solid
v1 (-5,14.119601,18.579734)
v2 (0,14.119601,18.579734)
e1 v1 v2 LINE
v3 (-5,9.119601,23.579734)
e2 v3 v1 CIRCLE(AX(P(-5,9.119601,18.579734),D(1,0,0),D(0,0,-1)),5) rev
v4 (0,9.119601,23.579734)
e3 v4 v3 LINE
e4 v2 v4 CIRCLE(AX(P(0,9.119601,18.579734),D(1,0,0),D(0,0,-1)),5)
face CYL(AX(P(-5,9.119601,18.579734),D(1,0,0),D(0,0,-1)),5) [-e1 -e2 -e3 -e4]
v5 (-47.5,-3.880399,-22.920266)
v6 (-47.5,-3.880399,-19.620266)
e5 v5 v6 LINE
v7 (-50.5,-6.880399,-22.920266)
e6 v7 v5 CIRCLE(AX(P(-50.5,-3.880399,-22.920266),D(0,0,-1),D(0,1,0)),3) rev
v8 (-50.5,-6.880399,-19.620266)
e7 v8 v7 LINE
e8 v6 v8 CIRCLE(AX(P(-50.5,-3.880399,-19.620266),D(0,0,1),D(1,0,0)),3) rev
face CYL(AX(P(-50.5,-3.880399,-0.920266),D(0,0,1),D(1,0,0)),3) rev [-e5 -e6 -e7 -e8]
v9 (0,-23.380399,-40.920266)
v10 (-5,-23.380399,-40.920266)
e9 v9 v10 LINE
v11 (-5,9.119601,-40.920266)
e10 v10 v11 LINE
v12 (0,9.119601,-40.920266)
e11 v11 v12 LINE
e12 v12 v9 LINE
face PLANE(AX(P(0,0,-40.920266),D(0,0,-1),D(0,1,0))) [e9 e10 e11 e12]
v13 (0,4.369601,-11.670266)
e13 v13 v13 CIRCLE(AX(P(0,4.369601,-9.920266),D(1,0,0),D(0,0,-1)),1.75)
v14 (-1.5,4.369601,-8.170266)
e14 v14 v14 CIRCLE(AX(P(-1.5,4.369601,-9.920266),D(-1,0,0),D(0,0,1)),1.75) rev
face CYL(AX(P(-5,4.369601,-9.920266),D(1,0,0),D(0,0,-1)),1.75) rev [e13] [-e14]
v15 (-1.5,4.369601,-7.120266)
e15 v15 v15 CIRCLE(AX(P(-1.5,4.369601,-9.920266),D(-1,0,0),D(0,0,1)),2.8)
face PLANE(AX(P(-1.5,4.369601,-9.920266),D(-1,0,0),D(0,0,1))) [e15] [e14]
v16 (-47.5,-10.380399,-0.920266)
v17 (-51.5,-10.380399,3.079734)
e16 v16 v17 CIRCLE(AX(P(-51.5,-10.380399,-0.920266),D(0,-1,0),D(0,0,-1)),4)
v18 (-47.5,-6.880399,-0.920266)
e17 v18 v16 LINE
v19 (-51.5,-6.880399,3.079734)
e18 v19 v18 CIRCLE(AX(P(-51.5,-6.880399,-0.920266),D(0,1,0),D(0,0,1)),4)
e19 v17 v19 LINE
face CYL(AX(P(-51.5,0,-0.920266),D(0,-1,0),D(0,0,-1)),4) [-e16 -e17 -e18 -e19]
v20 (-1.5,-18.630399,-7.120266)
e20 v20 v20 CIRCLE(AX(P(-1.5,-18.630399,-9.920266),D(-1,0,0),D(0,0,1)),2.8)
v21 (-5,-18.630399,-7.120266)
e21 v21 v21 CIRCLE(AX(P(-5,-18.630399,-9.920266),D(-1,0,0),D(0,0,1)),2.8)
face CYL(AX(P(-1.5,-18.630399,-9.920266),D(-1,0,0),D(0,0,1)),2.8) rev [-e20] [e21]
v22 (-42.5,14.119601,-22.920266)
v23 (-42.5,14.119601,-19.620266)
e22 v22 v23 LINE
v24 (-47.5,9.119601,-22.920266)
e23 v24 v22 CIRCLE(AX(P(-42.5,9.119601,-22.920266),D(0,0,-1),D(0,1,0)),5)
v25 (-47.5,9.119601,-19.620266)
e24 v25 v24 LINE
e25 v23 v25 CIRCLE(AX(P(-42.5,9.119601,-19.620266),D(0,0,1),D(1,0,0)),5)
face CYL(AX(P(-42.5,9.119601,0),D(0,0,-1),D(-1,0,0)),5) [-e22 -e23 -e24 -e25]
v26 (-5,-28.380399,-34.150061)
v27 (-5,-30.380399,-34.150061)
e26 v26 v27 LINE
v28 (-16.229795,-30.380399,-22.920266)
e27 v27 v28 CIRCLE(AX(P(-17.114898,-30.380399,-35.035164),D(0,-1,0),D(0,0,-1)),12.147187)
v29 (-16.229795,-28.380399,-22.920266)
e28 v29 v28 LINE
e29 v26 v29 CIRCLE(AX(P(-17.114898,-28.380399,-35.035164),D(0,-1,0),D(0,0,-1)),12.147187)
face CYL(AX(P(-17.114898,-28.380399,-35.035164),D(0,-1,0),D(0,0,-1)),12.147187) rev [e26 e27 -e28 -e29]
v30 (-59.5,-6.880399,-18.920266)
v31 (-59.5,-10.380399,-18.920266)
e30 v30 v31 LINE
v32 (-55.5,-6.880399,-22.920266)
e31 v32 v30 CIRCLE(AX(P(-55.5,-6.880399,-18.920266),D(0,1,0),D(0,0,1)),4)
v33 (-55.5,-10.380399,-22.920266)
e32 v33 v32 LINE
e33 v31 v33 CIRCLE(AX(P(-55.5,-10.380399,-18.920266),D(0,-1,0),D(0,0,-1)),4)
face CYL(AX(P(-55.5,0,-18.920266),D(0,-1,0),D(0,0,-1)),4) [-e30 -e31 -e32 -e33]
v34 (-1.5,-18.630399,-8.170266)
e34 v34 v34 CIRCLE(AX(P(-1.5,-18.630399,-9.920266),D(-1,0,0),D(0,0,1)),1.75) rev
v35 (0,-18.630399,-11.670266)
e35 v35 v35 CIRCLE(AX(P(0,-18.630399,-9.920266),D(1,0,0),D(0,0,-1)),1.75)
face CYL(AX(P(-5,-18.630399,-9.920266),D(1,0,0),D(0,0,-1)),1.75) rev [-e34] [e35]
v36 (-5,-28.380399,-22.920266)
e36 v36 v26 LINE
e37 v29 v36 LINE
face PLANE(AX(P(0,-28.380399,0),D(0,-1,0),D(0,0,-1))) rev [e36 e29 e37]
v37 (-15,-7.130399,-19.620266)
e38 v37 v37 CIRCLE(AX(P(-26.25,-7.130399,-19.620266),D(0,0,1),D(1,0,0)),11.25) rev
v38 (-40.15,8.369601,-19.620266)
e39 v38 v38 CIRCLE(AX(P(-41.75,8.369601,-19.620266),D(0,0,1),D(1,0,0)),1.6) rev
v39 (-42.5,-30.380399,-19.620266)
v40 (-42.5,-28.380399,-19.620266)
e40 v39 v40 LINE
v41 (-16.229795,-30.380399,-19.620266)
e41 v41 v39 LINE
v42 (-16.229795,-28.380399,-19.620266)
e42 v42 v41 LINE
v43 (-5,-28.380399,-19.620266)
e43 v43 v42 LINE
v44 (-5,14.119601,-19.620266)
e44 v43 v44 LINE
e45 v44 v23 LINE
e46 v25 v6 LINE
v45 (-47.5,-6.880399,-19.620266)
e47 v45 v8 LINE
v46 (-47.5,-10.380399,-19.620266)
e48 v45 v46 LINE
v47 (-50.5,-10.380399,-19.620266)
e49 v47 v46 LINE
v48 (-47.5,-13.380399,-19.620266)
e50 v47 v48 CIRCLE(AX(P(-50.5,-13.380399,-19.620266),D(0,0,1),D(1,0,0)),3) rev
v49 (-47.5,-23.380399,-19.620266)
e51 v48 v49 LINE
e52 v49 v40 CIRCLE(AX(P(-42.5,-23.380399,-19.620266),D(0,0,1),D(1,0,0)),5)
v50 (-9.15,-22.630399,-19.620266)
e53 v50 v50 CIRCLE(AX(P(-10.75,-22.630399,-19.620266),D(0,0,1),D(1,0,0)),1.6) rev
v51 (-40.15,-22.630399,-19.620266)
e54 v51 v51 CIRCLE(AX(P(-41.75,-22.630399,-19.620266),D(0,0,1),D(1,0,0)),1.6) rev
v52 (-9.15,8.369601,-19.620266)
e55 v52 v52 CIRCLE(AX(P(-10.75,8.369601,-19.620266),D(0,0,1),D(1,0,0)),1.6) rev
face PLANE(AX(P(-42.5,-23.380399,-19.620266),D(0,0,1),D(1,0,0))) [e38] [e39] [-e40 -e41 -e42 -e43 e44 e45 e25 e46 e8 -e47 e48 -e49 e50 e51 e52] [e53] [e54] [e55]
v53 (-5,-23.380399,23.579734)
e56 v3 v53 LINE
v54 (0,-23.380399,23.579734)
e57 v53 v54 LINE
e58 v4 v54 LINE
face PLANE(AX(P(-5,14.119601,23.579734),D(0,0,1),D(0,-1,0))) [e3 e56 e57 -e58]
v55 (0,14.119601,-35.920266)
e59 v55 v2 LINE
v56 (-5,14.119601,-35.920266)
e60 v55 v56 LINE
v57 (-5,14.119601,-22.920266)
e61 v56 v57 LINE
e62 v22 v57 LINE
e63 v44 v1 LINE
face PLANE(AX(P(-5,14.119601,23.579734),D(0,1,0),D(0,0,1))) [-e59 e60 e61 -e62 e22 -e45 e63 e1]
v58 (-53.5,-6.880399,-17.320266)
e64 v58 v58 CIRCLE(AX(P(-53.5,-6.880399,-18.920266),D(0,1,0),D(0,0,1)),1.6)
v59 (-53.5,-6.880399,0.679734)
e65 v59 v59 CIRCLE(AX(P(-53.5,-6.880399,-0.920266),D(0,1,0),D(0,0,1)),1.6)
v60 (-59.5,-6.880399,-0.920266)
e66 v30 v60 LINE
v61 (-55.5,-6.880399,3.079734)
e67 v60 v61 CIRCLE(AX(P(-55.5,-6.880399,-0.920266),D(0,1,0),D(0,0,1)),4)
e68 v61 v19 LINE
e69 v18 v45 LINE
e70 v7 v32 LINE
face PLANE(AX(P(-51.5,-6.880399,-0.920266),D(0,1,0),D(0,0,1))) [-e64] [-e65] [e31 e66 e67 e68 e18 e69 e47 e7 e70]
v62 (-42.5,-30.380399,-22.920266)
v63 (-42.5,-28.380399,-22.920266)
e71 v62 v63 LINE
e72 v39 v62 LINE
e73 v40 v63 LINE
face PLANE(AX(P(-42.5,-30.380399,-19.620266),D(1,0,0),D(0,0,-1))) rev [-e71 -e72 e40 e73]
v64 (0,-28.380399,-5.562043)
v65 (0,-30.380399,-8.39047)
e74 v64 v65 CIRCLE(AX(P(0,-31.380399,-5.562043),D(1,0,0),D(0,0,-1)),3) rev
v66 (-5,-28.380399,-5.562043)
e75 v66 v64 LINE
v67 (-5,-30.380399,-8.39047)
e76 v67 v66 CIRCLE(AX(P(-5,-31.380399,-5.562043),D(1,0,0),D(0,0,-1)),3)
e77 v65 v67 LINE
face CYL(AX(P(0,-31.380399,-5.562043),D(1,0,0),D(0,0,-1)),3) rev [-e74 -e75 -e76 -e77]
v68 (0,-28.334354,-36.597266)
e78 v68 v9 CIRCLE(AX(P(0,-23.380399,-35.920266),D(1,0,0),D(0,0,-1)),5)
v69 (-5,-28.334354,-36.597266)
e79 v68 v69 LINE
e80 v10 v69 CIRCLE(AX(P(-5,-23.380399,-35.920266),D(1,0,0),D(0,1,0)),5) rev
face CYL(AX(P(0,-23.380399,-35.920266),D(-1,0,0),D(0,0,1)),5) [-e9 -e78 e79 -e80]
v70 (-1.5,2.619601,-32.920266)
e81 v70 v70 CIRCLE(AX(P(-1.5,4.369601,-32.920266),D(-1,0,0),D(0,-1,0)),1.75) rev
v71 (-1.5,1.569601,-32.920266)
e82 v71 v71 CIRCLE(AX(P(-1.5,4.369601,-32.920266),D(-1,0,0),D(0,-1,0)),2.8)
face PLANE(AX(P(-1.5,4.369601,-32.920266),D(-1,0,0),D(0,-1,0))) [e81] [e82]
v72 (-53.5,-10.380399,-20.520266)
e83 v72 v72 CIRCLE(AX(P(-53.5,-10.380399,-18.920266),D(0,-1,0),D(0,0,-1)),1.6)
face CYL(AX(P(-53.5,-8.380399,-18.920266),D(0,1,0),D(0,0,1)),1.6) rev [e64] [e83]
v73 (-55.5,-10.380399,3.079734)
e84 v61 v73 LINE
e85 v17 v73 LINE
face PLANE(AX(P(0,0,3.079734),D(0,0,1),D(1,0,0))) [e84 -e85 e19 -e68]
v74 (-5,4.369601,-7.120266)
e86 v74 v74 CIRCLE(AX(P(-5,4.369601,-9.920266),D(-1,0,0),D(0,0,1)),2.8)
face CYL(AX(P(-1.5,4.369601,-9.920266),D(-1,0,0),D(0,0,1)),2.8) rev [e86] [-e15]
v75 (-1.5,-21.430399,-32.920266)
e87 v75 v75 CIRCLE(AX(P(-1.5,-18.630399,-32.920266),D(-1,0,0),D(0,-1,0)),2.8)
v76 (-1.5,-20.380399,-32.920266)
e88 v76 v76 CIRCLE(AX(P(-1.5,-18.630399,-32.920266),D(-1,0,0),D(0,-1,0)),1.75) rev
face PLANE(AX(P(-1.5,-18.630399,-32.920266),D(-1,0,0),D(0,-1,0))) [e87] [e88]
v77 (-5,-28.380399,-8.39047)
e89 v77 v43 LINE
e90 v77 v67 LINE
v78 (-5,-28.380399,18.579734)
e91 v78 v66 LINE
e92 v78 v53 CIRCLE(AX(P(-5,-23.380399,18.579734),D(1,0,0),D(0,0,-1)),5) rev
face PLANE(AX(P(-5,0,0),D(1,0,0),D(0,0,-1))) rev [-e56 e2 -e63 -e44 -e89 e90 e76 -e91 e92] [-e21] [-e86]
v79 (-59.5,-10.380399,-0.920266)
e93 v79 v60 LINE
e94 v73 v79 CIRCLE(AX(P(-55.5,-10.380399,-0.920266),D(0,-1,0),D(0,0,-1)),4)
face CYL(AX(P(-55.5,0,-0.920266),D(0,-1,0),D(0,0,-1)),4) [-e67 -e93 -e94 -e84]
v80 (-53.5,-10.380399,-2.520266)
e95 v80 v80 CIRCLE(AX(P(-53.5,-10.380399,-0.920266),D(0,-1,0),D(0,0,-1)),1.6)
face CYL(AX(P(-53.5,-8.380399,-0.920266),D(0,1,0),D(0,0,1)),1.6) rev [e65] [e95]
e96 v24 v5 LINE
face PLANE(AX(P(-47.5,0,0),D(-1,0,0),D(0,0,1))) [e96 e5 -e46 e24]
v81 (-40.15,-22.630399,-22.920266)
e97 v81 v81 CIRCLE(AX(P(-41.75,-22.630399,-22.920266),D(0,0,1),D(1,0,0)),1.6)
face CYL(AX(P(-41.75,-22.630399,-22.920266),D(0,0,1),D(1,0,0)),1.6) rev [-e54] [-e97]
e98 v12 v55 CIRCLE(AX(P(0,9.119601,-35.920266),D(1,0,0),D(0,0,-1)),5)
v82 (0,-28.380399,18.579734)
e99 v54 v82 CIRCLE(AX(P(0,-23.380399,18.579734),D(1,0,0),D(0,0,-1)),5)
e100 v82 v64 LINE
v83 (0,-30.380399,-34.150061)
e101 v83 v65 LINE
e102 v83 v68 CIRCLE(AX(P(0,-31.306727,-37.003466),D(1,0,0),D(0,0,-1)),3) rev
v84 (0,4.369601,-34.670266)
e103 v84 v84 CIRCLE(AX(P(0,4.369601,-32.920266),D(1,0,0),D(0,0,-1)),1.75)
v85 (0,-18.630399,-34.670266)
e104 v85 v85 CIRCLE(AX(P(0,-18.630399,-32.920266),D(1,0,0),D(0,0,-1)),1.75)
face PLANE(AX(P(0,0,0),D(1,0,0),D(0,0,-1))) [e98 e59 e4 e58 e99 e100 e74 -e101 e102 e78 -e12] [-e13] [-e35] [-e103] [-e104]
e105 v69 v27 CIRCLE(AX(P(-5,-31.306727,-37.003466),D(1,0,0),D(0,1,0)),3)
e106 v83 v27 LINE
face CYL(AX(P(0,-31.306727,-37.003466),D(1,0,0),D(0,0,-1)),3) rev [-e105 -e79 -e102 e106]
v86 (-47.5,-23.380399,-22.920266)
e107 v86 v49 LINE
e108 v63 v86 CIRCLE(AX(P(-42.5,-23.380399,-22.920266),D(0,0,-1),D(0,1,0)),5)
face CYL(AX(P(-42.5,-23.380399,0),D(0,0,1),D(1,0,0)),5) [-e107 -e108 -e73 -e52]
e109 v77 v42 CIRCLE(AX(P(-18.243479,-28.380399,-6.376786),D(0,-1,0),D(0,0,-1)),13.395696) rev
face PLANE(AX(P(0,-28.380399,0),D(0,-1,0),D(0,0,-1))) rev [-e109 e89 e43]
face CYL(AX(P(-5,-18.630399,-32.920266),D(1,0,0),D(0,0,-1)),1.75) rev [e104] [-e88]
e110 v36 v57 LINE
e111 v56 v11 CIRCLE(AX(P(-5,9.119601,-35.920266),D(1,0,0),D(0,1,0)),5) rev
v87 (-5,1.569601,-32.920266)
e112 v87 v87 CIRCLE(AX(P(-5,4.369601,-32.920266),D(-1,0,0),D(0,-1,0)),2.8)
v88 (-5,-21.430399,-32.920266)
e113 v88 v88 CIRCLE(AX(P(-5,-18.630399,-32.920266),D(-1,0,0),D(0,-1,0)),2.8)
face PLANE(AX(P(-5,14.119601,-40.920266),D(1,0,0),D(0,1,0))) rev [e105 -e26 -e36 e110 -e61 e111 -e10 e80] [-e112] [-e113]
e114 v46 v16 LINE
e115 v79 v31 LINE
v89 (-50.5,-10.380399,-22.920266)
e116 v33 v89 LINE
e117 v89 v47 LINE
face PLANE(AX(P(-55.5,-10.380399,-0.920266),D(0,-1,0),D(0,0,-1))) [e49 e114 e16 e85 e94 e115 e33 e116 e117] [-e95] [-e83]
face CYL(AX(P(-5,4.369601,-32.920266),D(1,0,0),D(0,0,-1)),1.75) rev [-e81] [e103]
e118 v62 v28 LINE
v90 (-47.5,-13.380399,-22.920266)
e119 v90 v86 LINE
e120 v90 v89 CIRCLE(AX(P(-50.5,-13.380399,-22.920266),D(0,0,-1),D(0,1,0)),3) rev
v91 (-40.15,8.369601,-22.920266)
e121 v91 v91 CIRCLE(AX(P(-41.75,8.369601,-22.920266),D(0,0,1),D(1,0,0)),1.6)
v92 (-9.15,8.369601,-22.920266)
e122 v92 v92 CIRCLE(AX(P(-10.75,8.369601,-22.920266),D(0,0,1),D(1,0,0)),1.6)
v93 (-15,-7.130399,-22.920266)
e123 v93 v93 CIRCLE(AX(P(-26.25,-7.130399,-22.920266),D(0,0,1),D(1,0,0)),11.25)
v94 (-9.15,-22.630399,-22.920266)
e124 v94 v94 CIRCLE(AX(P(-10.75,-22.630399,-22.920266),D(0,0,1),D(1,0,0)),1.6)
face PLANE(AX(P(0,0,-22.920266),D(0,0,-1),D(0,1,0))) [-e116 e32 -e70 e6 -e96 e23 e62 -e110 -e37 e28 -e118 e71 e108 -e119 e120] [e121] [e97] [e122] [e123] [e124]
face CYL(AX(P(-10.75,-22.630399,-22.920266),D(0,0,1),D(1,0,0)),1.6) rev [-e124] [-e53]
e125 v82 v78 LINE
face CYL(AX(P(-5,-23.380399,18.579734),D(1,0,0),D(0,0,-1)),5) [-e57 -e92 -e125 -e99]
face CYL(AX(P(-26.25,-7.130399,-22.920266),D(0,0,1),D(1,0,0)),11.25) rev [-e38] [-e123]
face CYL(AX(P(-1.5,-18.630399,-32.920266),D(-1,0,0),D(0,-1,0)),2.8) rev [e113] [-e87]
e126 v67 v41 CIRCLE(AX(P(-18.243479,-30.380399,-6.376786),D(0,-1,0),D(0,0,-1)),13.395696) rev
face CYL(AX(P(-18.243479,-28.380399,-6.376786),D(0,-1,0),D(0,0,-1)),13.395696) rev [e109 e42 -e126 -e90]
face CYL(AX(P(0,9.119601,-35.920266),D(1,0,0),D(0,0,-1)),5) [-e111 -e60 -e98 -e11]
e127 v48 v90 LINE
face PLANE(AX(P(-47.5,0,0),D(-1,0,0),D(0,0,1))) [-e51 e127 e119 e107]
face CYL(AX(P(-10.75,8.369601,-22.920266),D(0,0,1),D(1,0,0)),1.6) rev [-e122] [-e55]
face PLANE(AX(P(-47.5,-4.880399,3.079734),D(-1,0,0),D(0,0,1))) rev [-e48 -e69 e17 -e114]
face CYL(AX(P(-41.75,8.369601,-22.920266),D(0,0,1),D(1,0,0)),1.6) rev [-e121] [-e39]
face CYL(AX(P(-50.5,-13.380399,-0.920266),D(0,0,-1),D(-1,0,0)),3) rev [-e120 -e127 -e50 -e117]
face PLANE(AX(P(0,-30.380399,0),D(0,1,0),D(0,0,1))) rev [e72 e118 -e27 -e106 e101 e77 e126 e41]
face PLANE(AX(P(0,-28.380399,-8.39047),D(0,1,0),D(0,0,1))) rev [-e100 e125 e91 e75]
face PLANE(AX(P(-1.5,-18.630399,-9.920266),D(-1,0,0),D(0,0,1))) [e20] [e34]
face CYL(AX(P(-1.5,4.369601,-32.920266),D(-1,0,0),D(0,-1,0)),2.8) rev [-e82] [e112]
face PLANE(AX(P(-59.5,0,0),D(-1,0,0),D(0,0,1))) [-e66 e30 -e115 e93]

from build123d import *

# Parameters (mm, degrees)
CROQUIS1_W               = 42.5
CROQUIS1_H               = 42.5
SALIENTE_EXTRUIR1_DEPTH  = 5
CROQUIS6_W               = 5
CROQUIS6_H               = 42.5
SALIENTE_EXTRUIR2_DEPTH  = 4
CROQUIS7_W               = 4
CROQUIS7_H               = 42.5
SALIENTE_EXTRUIR3_DEPTH  = 42.5
CROQUIS8_R               = 11.25
CROQUIS8_R_2             = 1.6
CORTAR_EXTRUIR2_DEPTH    = 4
CROQUIS10_W              = 4
CROQUIS10_H              = 3.5
SALIENTE_EXTRUIR4_DEPTH  = 12
CROQUIS11_W              = 12
CROQUIS11_H              = 3.5
SALIENTE_EXTRUIR5_DEPTH  = 22
CROQUIS12_R              = 1.6
CORTAR_EXTRUIR4_DEPTH    = 3.5
REDONDEO1_R              = 5
REDONDEO2_R              = 5
REDONDEO3_R              = 4
CORTAR_EXTRUIR5_DEPTH    = 0.7
CROQUIS14_W              = 5
CROQUIS14_H              = 42.5
SALIENTE_EXTRUIR6_DEPTH  = 18
CROQUIS15_R              = 1.75
CORTAR_EXTRUIR6_DEPTH    = 5
CROQUIS16_R              = 2.8
CORTAR_EXTRUIR7_DEPTH    = 3.5
CROQUIS17_R              = 2.8
CORTAR_EXTRUIR8_DEPTH    = 3.5
REDONDEO5_R              = 5
CROQUIS18_R              = 1.6
SALIENTE_EXTRUIR8_DEPTH  = 2
CROQUIS19_R              = 1.6
CORTAR_EXTRUIR9_DEPTH    = 2
REDONDEO7_R              = 3
REDONDEO8_R              = 3
SALIENTE_EXTRUIR9_DEPTH  = 2
SALIENTE_EXTRUIR10_DEPTH = 2
CROQUIS22_W              = 26.97020456
CROQUIS22_H              = 2
CORTAR_EXTRUIR10_DEPTH   = 5
CROQUIS23_W              = 1.770204561
CROQUIS23_H              = 2
CORTAR_EXTRUIR11_DEPTH   = 5
REDONDEO9_R              = 3


with BuildPart() as part:
    # Croquis1 → Saliente-Extruir1 (new body)
    with BuildSketch(Plane(origin=(0, 0, 0), x_dir=(0, 0, -1), z_dir=(1, 0, 0))):
        with Locations((-2.329734219, -7.130398671)):
            Rectangle(CROQUIS1_W, CROQUIS1_H)
    extrude(amount=-SALIENTE_EXTRUIR1_DEPTH)

    # Croquis6 → Saliente-Extruir2 (add)
    with BuildSketch(Plane(origin=(0, 0, -18.920265781), x_dir=(-1, 0, 0), z_dir=(0, 0, -1))):
        with Locations((2.5, -7.130398671)):
            Rectangle(CROQUIS6_W, CROQUIS6_H)
    extrude(amount=SALIENTE_EXTRUIR2_DEPTH)

    # Croquis7 → Saliente-Extruir3 (add)
    with BuildSketch(Plane.ZY.offset(5)):
        with Locations((-20.920265781, -7.130398671)):
            Rectangle(CROQUIS7_W, CROQUIS7_H)
    extrude(amount=SALIENTE_EXTRUIR3_DEPTH)

    # Croquis8 → Cortar-Extruir2 (cut)
    with BuildSketch(Plane.XY.offset(-18.920265781)):
        with Locations((-26.25, -7.130398671)):
            Circle(CROQUIS8_R)
        with Locations((-41.75, 8.369601329)):
            Circle(CROQUIS8_R_2)
        with Locations((-10.75, 8.369601329)):
            Circle(CROQUIS8_R_2)
        with Locations((-10.75, -22.630398671)):
            Circle(CROQUIS8_R_2)
        with Locations((-41.75, -22.630398671)):
            Circle(CROQUIS8_R_2)
    extrude(amount=-CORTAR_EXTRUIR2_DEPTH, mode=Mode.SUBTRACT)

    # Croquis10 → Saliente-Extruir4 (add)
    with BuildSketch(Plane.ZY.offset(47.5)):
        with Locations((-20.920265781, -6.630398671)):
            Rectangle(CROQUIS10_W, CROQUIS10_H)
    extrude(amount=SALIENTE_EXTRUIR4_DEPTH)

    # Croquis11 → Saliente-Extruir5 (add)
    with BuildSketch(Plane.XY.offset(-18.920265781)):
        with Locations((-53.5, -6.630398671)):
            Rectangle(CROQUIS11_W, CROQUIS11_H)
    extrude(amount=SALIENTE_EXTRUIR5_DEPTH)

    # Croquis12 → Cortar-Extruir4 (cut)
    with BuildSketch(Plane(origin=(0, -4.880398671, 0), x_dir=(1, 0, 0), z_dir=(0, 1, 0))):
        with Locations(Location((-53.5, 18.920265781, 0), (0, 0, 270))):
            Circle(CROQUIS12_R)
        with Locations(Location((-53.5, 0.920265781, 0), (0, 0, 270))):
            Circle(CROQUIS12_R)
    extrude(amount=-CORTAR_EXTRUIR4_DEPTH, mode=Mode.SUBTRACT)

    # Redondeo1
    redondeo1_edges = [part.edges().sort_by_distance(p)[0] for p in [
        (-2.5, -28.380398671, 23.579734219),
        (-2.5, 14.119601329, 23.579734219),
    ]]
    fillet(redondeo1_edges, radius=REDONDEO1_R)

    # Redondeo2
    redondeo2_edges = [part.edges().sort_by_distance(p)[0] for p in [
        (-47.5, -28.380398671, -20.920265781),
        (-47.5, 14.119601329, -20.920265781),
    ]]
    fillet(redondeo2_edges, radius=REDONDEO2_R)

    # Redondeo3
    redondeo3_edges = [part.edges().sort_by_distance(p)[0] for p in [
        (-59.5, -6.630398671, -22.920265781),
        (-59.5, -6.630398671, 3.079734219),
        (-47.5, -6.630398671, 3.079734219),
    ]]
    fillet(redondeo3_edges, radius=REDONDEO3_R)

    # Croquis13 → Cortar-Extruir5 (cut)
    with BuildSketch(Plane.XY.offset(-18.920265781)):
        with BuildLine():
            Line((-47.5, -8.380398671), (-47.5, -23.380398671))
            ThreePointArc((-47.5, -23.380398671), (-46.035533906, -26.915932577), (-42.5, -28.380398671))
            Line((-42.5, -28.380398671), (-5, -28.380398671))
            Line((-5, -28.380398671), (-5, 14.119601329))
            Line((-5, 14.119601329), (-42.5, 14.119601329))
            ThreePointArc((-42.5, 14.119601329), (-46.035533906, 12.655135235), (-47.5, 9.119601329))
            Line((-47.5, 9.119601329), (-47.5, -4.880398671))
            Line((-47.5, -4.880398671), (-47.5, -8.380398671))
        make_face()
    extrude(amount=-CORTAR_EXTRUIR5_DEPTH, mode=Mode.SUBTRACT)

    # Croquis14 → Saliente-Extruir6 (add)
    with BuildSketch(Plane(origin=(0, 0, -22.920265781), x_dir=(-1, 0, 0), z_dir=(0, 0, -1))):
        with Locations((2.5, -7.130398671)):
            Rectangle(CROQUIS14_W, CROQUIS14_H)
    extrude(amount=SALIENTE_EXTRUIR6_DEPTH)

    # Croquis15 → Cortar-Extruir6 (cut)
    with BuildSketch(Plane(origin=(0, 0, 0), x_dir=(0, 0, -1), z_dir=(1, 0, 0))):
        with Locations((9.920265781, 4.369601329)):
            Circle(CROQUIS15_R)
        with Locations((32.920265781, 4.369601329)):
            Circle(CROQUIS15_R)
        with Locations((32.920265781, -18.630398671)):
            Circle(CROQUIS15_R)
        with Locations((9.920265781, -18.630398671)):
            Circle(CROQUIS15_R)
    extrude(amount=-CORTAR_EXTRUIR6_DEPTH, mode=Mode.SUBTRACT)

    # Croquis16 → Cortar-Extruir7 (cut)
    with BuildSketch(Plane.ZY.offset(5)):
        with Locations((-9.920265781, 4.369601329)):
            Circle(CROQUIS16_R)
        with Locations((-9.920265781, -18.630398671)):
            Circle(CROQUIS16_R)
    extrude(amount=-CORTAR_EXTRUIR7_DEPTH, mode=Mode.SUBTRACT)

    # Croquis17 → Cortar-Extruir8 (cut)
    with BuildSketch(Plane.ZY.offset(5)):
        with Locations(Location((-32.920265781, 4.369601329, 0), (0, 0, 270))):
            Circle(CROQUIS17_R)
        with Locations(Location((-32.920265781, -18.630398671, 0), (0, 0, 270))):
            Circle(CROQUIS17_R)
    extrude(amount=-CORTAR_EXTRUIR8_DEPTH, mode=Mode.SUBTRACT)

    # Redondeo5
    redondeo5_edges = [part.edges().sort_by_distance(p)[0] for p in [
        (-2.5, -28.380398671, -40.920265781),
        (-2.5, 14.119601329, -40.920265781),
    ]]
    fillet(redondeo5_edges, radius=REDONDEO5_R)

    # Croquis18 → Saliente-Extruir8 (add)
    with BuildSketch(Plane.XZ.offset(8.380398671)):
        with BuildLine():
            Line((-59.5, -0.920265781), (-59.5, -18.920265781))
            ThreePointArc((-59.5, -18.920265781), (-58.328427125, -21.748692905), (-55.5, -22.920265781))
            Line((-55.5, -22.920265781), (-47.5, -22.920265781))
            Line((-47.5, -22.920265781), (-47.5, -19.620265781))
            Line((-47.5, -19.620265781), (-47.5, -0.920265781))
            ThreePointArc((-47.5, -0.920265781), (-48.671572875, 1.908161344), (-51.5, 3.079734219))
            Line((-51.5, 3.079734219), (-55.5, 3.079734219))
            ThreePointArc((-55.5, 3.079734219), (-58.328427125, 1.908161344), (-59.5, -0.920265781))
        make_face()
        with Locations(Location((-53.5, -0.920265781, 0), (0, 0, 90))):
            Circle(CROQUIS18_R, mode=Mode.SUBTRACT)
        with Locations(Location((-53.5, -18.920265781, 0), (0, 0, 90))):
            Circle(CROQUIS18_R, mode=Mode.SUBTRACT)
    extrude(amount=SALIENTE_EXTRUIR8_DEPTH)

    # Croquis19 → Cortar-Extruir9 (cut)
    with BuildSketch(Plane(origin=(0, -4.880398671, 0), x_dir=(1, 0, 0), z_dir=(0, 1, 0))):
        with BuildLine():
            Line((-51.5, -3.079734219), (-55.5, -3.079734219))
            ThreePointArc((-55.5, -3.079734219), (-58.328427125, -1.908161344), (-59.5, 0.920265781))
            Line((-59.5, 0.920265781), (-59.5, 18.920265781))
            ThreePointArc((-59.5, 18.920265781), (-58.328427125, 21.748692905), (-55.5, 22.920265781))
            Line((-55.5, 22.920265781), (-47.5, 22.920265781))
            Line((-47.5, 22.920265781), (-47.5, 19.620265781))
            Line((-47.5, 19.620265781), (-47.5, 0.920265781))
            ThreePointArc((-47.5, 0.920265781), (-48.671572875, -1.908161344), (-51.5, -3.079734219))
        make_face()
        with Locations(Location((-53.5, 18.920265781, 0), (0, 0, 270))):
            Circle(CROQUIS19_R, mode=Mode.SUBTRACT)
        with Locations(Location((-53.5, 0.920265781, 0), (0, 0, 270))):
            Circle(CROQUIS19_R, mode=Mode.SUBTRACT)
    extrude(amount=-CORTAR_EXTRUIR9_DEPTH, mode=Mode.SUBTRACT)

    # Redondeo7
    redondeo7_edges = [part.edges().sort_by_distance(p)[0] for p in [
        (-47.5, -6.880398671, -21.270265781),
    ]]
    fillet(redondeo7_edges, radius=REDONDEO7_R)

    # Redondeo8
    redondeo8_edges = [part.edges().sort_by_distance(p)[0] for p in [
        (-47.5, -10.380398671, -21.270265781),
    ]]
    fillet(redondeo8_edges, radius=REDONDEO8_R)

    # Croquis20 → Saliente-Extruir9 (add)
    with BuildSketch(Plane.XZ.offset(28.380398671)):
        Polygon((-5, -22.920265781), (-5, -35.920265781), (0, -35.920265781), (0, 18.579734219), (-5, 18.579734219), (-5, -19.620265781), (-42.5, -19.620265781), (-42.5, -22.920265781), align=None)
    extrude(amount=SALIENTE_EXTRUIR9_DEPTH)

    # Croquis21 → Saliente-Extruir10 (add)
    with BuildSketch(Plane.XZ.offset(30.380398671)):
        with BuildLine():
            Line((-16.22979544, -19.620265781), (-5, -19.620265781))
            Line((-5, -19.620265781), (-5, -8.390470341))
            ThreePointArc((-5, -8.390470341), (-8.771291942, -15.848973839), (-16.22979544, -19.620265781))
        make_face()
        with BuildLine():
            ThreePointArc((-16.22979544, -22.920265781), (-8.525539397, -26.445805177), (-5, -34.15006122))
            Line((-5, -34.15006122), (-5, -22.920265781))
            Line((-5, -22.920265781), (-16.22979544, -22.920265781))
        make_face()
    extrude(amount=-SALIENTE_EXTRUIR10_DEPTH)

    # Croquis22 → Cortar-Extruir10 (cut)
    with BuildSketch(Plane.ZY.offset(5)):
        with Locations((5.094631939, -29.380398671)):
            Rectangle(CROQUIS22_W, CROQUIS22_H)
    extrude(amount=-CORTAR_EXTRUIR10_DEPTH, mode=Mode.SUBTRACT)

    # Croquis23 → Cortar-Extruir11 (cut)
    with BuildSketch(Plane.ZY.offset(5)):
        with Locations((-35.035163501, -29.380398671)):
            Rectangle(CROQUIS23_W, CROQUIS23_H)
    extrude(amount=-CORTAR_EXTRUIR11_DEPTH, mode=Mode.SUBTRACT)

    # Redondeo9
    # the kernel refuses this fillet: 3 mm, written as the material it adds along each edge
    with BuildSketch(Plane(origin=(-5, -28.380398671, -34.15006122), x_dir=(0, -1, 0), z_dir=(1, 0, 0))) as redondeo9_piece_1:
        with BuildLine():
            CenterArc((2.926328174, 2.853404303), REDONDEO9_R, 187.781748717, 64.232765745)
            Line((-0.046044891, 2.447204399), (-0.343282198, 2.406584409))
            ThreePointArc((-0.343282198, 2.406584409), (-0.3, 1.77020456), (-0.3, 0))
            Line((-0.3, 0), (0, -0.3))
            ThreePointArc((0, -0.3), (1, -0.3), (1.907367183, -0.28534043))
            Line((1.907367183, -0.28534043), (2, 0))
        make_face()
    extrude(amount=5)
    with BuildSketch(Plane(origin=(-5, -28.380398671, -8.390470341), x_dir=(0, -1, 0), z_dir=(1, 0, 0))) as redondeo9_piece_2:
        with BuildLine():
            CenterArc((3, -2.828427125), REDONDEO9_R, 109.471220634, 70.528779366)
            Line((0, -2.828427125), (0, 0))
            Line((0, 0), (2, 0))
        make_face()
    extrude(amount=5)


solid = part.part
